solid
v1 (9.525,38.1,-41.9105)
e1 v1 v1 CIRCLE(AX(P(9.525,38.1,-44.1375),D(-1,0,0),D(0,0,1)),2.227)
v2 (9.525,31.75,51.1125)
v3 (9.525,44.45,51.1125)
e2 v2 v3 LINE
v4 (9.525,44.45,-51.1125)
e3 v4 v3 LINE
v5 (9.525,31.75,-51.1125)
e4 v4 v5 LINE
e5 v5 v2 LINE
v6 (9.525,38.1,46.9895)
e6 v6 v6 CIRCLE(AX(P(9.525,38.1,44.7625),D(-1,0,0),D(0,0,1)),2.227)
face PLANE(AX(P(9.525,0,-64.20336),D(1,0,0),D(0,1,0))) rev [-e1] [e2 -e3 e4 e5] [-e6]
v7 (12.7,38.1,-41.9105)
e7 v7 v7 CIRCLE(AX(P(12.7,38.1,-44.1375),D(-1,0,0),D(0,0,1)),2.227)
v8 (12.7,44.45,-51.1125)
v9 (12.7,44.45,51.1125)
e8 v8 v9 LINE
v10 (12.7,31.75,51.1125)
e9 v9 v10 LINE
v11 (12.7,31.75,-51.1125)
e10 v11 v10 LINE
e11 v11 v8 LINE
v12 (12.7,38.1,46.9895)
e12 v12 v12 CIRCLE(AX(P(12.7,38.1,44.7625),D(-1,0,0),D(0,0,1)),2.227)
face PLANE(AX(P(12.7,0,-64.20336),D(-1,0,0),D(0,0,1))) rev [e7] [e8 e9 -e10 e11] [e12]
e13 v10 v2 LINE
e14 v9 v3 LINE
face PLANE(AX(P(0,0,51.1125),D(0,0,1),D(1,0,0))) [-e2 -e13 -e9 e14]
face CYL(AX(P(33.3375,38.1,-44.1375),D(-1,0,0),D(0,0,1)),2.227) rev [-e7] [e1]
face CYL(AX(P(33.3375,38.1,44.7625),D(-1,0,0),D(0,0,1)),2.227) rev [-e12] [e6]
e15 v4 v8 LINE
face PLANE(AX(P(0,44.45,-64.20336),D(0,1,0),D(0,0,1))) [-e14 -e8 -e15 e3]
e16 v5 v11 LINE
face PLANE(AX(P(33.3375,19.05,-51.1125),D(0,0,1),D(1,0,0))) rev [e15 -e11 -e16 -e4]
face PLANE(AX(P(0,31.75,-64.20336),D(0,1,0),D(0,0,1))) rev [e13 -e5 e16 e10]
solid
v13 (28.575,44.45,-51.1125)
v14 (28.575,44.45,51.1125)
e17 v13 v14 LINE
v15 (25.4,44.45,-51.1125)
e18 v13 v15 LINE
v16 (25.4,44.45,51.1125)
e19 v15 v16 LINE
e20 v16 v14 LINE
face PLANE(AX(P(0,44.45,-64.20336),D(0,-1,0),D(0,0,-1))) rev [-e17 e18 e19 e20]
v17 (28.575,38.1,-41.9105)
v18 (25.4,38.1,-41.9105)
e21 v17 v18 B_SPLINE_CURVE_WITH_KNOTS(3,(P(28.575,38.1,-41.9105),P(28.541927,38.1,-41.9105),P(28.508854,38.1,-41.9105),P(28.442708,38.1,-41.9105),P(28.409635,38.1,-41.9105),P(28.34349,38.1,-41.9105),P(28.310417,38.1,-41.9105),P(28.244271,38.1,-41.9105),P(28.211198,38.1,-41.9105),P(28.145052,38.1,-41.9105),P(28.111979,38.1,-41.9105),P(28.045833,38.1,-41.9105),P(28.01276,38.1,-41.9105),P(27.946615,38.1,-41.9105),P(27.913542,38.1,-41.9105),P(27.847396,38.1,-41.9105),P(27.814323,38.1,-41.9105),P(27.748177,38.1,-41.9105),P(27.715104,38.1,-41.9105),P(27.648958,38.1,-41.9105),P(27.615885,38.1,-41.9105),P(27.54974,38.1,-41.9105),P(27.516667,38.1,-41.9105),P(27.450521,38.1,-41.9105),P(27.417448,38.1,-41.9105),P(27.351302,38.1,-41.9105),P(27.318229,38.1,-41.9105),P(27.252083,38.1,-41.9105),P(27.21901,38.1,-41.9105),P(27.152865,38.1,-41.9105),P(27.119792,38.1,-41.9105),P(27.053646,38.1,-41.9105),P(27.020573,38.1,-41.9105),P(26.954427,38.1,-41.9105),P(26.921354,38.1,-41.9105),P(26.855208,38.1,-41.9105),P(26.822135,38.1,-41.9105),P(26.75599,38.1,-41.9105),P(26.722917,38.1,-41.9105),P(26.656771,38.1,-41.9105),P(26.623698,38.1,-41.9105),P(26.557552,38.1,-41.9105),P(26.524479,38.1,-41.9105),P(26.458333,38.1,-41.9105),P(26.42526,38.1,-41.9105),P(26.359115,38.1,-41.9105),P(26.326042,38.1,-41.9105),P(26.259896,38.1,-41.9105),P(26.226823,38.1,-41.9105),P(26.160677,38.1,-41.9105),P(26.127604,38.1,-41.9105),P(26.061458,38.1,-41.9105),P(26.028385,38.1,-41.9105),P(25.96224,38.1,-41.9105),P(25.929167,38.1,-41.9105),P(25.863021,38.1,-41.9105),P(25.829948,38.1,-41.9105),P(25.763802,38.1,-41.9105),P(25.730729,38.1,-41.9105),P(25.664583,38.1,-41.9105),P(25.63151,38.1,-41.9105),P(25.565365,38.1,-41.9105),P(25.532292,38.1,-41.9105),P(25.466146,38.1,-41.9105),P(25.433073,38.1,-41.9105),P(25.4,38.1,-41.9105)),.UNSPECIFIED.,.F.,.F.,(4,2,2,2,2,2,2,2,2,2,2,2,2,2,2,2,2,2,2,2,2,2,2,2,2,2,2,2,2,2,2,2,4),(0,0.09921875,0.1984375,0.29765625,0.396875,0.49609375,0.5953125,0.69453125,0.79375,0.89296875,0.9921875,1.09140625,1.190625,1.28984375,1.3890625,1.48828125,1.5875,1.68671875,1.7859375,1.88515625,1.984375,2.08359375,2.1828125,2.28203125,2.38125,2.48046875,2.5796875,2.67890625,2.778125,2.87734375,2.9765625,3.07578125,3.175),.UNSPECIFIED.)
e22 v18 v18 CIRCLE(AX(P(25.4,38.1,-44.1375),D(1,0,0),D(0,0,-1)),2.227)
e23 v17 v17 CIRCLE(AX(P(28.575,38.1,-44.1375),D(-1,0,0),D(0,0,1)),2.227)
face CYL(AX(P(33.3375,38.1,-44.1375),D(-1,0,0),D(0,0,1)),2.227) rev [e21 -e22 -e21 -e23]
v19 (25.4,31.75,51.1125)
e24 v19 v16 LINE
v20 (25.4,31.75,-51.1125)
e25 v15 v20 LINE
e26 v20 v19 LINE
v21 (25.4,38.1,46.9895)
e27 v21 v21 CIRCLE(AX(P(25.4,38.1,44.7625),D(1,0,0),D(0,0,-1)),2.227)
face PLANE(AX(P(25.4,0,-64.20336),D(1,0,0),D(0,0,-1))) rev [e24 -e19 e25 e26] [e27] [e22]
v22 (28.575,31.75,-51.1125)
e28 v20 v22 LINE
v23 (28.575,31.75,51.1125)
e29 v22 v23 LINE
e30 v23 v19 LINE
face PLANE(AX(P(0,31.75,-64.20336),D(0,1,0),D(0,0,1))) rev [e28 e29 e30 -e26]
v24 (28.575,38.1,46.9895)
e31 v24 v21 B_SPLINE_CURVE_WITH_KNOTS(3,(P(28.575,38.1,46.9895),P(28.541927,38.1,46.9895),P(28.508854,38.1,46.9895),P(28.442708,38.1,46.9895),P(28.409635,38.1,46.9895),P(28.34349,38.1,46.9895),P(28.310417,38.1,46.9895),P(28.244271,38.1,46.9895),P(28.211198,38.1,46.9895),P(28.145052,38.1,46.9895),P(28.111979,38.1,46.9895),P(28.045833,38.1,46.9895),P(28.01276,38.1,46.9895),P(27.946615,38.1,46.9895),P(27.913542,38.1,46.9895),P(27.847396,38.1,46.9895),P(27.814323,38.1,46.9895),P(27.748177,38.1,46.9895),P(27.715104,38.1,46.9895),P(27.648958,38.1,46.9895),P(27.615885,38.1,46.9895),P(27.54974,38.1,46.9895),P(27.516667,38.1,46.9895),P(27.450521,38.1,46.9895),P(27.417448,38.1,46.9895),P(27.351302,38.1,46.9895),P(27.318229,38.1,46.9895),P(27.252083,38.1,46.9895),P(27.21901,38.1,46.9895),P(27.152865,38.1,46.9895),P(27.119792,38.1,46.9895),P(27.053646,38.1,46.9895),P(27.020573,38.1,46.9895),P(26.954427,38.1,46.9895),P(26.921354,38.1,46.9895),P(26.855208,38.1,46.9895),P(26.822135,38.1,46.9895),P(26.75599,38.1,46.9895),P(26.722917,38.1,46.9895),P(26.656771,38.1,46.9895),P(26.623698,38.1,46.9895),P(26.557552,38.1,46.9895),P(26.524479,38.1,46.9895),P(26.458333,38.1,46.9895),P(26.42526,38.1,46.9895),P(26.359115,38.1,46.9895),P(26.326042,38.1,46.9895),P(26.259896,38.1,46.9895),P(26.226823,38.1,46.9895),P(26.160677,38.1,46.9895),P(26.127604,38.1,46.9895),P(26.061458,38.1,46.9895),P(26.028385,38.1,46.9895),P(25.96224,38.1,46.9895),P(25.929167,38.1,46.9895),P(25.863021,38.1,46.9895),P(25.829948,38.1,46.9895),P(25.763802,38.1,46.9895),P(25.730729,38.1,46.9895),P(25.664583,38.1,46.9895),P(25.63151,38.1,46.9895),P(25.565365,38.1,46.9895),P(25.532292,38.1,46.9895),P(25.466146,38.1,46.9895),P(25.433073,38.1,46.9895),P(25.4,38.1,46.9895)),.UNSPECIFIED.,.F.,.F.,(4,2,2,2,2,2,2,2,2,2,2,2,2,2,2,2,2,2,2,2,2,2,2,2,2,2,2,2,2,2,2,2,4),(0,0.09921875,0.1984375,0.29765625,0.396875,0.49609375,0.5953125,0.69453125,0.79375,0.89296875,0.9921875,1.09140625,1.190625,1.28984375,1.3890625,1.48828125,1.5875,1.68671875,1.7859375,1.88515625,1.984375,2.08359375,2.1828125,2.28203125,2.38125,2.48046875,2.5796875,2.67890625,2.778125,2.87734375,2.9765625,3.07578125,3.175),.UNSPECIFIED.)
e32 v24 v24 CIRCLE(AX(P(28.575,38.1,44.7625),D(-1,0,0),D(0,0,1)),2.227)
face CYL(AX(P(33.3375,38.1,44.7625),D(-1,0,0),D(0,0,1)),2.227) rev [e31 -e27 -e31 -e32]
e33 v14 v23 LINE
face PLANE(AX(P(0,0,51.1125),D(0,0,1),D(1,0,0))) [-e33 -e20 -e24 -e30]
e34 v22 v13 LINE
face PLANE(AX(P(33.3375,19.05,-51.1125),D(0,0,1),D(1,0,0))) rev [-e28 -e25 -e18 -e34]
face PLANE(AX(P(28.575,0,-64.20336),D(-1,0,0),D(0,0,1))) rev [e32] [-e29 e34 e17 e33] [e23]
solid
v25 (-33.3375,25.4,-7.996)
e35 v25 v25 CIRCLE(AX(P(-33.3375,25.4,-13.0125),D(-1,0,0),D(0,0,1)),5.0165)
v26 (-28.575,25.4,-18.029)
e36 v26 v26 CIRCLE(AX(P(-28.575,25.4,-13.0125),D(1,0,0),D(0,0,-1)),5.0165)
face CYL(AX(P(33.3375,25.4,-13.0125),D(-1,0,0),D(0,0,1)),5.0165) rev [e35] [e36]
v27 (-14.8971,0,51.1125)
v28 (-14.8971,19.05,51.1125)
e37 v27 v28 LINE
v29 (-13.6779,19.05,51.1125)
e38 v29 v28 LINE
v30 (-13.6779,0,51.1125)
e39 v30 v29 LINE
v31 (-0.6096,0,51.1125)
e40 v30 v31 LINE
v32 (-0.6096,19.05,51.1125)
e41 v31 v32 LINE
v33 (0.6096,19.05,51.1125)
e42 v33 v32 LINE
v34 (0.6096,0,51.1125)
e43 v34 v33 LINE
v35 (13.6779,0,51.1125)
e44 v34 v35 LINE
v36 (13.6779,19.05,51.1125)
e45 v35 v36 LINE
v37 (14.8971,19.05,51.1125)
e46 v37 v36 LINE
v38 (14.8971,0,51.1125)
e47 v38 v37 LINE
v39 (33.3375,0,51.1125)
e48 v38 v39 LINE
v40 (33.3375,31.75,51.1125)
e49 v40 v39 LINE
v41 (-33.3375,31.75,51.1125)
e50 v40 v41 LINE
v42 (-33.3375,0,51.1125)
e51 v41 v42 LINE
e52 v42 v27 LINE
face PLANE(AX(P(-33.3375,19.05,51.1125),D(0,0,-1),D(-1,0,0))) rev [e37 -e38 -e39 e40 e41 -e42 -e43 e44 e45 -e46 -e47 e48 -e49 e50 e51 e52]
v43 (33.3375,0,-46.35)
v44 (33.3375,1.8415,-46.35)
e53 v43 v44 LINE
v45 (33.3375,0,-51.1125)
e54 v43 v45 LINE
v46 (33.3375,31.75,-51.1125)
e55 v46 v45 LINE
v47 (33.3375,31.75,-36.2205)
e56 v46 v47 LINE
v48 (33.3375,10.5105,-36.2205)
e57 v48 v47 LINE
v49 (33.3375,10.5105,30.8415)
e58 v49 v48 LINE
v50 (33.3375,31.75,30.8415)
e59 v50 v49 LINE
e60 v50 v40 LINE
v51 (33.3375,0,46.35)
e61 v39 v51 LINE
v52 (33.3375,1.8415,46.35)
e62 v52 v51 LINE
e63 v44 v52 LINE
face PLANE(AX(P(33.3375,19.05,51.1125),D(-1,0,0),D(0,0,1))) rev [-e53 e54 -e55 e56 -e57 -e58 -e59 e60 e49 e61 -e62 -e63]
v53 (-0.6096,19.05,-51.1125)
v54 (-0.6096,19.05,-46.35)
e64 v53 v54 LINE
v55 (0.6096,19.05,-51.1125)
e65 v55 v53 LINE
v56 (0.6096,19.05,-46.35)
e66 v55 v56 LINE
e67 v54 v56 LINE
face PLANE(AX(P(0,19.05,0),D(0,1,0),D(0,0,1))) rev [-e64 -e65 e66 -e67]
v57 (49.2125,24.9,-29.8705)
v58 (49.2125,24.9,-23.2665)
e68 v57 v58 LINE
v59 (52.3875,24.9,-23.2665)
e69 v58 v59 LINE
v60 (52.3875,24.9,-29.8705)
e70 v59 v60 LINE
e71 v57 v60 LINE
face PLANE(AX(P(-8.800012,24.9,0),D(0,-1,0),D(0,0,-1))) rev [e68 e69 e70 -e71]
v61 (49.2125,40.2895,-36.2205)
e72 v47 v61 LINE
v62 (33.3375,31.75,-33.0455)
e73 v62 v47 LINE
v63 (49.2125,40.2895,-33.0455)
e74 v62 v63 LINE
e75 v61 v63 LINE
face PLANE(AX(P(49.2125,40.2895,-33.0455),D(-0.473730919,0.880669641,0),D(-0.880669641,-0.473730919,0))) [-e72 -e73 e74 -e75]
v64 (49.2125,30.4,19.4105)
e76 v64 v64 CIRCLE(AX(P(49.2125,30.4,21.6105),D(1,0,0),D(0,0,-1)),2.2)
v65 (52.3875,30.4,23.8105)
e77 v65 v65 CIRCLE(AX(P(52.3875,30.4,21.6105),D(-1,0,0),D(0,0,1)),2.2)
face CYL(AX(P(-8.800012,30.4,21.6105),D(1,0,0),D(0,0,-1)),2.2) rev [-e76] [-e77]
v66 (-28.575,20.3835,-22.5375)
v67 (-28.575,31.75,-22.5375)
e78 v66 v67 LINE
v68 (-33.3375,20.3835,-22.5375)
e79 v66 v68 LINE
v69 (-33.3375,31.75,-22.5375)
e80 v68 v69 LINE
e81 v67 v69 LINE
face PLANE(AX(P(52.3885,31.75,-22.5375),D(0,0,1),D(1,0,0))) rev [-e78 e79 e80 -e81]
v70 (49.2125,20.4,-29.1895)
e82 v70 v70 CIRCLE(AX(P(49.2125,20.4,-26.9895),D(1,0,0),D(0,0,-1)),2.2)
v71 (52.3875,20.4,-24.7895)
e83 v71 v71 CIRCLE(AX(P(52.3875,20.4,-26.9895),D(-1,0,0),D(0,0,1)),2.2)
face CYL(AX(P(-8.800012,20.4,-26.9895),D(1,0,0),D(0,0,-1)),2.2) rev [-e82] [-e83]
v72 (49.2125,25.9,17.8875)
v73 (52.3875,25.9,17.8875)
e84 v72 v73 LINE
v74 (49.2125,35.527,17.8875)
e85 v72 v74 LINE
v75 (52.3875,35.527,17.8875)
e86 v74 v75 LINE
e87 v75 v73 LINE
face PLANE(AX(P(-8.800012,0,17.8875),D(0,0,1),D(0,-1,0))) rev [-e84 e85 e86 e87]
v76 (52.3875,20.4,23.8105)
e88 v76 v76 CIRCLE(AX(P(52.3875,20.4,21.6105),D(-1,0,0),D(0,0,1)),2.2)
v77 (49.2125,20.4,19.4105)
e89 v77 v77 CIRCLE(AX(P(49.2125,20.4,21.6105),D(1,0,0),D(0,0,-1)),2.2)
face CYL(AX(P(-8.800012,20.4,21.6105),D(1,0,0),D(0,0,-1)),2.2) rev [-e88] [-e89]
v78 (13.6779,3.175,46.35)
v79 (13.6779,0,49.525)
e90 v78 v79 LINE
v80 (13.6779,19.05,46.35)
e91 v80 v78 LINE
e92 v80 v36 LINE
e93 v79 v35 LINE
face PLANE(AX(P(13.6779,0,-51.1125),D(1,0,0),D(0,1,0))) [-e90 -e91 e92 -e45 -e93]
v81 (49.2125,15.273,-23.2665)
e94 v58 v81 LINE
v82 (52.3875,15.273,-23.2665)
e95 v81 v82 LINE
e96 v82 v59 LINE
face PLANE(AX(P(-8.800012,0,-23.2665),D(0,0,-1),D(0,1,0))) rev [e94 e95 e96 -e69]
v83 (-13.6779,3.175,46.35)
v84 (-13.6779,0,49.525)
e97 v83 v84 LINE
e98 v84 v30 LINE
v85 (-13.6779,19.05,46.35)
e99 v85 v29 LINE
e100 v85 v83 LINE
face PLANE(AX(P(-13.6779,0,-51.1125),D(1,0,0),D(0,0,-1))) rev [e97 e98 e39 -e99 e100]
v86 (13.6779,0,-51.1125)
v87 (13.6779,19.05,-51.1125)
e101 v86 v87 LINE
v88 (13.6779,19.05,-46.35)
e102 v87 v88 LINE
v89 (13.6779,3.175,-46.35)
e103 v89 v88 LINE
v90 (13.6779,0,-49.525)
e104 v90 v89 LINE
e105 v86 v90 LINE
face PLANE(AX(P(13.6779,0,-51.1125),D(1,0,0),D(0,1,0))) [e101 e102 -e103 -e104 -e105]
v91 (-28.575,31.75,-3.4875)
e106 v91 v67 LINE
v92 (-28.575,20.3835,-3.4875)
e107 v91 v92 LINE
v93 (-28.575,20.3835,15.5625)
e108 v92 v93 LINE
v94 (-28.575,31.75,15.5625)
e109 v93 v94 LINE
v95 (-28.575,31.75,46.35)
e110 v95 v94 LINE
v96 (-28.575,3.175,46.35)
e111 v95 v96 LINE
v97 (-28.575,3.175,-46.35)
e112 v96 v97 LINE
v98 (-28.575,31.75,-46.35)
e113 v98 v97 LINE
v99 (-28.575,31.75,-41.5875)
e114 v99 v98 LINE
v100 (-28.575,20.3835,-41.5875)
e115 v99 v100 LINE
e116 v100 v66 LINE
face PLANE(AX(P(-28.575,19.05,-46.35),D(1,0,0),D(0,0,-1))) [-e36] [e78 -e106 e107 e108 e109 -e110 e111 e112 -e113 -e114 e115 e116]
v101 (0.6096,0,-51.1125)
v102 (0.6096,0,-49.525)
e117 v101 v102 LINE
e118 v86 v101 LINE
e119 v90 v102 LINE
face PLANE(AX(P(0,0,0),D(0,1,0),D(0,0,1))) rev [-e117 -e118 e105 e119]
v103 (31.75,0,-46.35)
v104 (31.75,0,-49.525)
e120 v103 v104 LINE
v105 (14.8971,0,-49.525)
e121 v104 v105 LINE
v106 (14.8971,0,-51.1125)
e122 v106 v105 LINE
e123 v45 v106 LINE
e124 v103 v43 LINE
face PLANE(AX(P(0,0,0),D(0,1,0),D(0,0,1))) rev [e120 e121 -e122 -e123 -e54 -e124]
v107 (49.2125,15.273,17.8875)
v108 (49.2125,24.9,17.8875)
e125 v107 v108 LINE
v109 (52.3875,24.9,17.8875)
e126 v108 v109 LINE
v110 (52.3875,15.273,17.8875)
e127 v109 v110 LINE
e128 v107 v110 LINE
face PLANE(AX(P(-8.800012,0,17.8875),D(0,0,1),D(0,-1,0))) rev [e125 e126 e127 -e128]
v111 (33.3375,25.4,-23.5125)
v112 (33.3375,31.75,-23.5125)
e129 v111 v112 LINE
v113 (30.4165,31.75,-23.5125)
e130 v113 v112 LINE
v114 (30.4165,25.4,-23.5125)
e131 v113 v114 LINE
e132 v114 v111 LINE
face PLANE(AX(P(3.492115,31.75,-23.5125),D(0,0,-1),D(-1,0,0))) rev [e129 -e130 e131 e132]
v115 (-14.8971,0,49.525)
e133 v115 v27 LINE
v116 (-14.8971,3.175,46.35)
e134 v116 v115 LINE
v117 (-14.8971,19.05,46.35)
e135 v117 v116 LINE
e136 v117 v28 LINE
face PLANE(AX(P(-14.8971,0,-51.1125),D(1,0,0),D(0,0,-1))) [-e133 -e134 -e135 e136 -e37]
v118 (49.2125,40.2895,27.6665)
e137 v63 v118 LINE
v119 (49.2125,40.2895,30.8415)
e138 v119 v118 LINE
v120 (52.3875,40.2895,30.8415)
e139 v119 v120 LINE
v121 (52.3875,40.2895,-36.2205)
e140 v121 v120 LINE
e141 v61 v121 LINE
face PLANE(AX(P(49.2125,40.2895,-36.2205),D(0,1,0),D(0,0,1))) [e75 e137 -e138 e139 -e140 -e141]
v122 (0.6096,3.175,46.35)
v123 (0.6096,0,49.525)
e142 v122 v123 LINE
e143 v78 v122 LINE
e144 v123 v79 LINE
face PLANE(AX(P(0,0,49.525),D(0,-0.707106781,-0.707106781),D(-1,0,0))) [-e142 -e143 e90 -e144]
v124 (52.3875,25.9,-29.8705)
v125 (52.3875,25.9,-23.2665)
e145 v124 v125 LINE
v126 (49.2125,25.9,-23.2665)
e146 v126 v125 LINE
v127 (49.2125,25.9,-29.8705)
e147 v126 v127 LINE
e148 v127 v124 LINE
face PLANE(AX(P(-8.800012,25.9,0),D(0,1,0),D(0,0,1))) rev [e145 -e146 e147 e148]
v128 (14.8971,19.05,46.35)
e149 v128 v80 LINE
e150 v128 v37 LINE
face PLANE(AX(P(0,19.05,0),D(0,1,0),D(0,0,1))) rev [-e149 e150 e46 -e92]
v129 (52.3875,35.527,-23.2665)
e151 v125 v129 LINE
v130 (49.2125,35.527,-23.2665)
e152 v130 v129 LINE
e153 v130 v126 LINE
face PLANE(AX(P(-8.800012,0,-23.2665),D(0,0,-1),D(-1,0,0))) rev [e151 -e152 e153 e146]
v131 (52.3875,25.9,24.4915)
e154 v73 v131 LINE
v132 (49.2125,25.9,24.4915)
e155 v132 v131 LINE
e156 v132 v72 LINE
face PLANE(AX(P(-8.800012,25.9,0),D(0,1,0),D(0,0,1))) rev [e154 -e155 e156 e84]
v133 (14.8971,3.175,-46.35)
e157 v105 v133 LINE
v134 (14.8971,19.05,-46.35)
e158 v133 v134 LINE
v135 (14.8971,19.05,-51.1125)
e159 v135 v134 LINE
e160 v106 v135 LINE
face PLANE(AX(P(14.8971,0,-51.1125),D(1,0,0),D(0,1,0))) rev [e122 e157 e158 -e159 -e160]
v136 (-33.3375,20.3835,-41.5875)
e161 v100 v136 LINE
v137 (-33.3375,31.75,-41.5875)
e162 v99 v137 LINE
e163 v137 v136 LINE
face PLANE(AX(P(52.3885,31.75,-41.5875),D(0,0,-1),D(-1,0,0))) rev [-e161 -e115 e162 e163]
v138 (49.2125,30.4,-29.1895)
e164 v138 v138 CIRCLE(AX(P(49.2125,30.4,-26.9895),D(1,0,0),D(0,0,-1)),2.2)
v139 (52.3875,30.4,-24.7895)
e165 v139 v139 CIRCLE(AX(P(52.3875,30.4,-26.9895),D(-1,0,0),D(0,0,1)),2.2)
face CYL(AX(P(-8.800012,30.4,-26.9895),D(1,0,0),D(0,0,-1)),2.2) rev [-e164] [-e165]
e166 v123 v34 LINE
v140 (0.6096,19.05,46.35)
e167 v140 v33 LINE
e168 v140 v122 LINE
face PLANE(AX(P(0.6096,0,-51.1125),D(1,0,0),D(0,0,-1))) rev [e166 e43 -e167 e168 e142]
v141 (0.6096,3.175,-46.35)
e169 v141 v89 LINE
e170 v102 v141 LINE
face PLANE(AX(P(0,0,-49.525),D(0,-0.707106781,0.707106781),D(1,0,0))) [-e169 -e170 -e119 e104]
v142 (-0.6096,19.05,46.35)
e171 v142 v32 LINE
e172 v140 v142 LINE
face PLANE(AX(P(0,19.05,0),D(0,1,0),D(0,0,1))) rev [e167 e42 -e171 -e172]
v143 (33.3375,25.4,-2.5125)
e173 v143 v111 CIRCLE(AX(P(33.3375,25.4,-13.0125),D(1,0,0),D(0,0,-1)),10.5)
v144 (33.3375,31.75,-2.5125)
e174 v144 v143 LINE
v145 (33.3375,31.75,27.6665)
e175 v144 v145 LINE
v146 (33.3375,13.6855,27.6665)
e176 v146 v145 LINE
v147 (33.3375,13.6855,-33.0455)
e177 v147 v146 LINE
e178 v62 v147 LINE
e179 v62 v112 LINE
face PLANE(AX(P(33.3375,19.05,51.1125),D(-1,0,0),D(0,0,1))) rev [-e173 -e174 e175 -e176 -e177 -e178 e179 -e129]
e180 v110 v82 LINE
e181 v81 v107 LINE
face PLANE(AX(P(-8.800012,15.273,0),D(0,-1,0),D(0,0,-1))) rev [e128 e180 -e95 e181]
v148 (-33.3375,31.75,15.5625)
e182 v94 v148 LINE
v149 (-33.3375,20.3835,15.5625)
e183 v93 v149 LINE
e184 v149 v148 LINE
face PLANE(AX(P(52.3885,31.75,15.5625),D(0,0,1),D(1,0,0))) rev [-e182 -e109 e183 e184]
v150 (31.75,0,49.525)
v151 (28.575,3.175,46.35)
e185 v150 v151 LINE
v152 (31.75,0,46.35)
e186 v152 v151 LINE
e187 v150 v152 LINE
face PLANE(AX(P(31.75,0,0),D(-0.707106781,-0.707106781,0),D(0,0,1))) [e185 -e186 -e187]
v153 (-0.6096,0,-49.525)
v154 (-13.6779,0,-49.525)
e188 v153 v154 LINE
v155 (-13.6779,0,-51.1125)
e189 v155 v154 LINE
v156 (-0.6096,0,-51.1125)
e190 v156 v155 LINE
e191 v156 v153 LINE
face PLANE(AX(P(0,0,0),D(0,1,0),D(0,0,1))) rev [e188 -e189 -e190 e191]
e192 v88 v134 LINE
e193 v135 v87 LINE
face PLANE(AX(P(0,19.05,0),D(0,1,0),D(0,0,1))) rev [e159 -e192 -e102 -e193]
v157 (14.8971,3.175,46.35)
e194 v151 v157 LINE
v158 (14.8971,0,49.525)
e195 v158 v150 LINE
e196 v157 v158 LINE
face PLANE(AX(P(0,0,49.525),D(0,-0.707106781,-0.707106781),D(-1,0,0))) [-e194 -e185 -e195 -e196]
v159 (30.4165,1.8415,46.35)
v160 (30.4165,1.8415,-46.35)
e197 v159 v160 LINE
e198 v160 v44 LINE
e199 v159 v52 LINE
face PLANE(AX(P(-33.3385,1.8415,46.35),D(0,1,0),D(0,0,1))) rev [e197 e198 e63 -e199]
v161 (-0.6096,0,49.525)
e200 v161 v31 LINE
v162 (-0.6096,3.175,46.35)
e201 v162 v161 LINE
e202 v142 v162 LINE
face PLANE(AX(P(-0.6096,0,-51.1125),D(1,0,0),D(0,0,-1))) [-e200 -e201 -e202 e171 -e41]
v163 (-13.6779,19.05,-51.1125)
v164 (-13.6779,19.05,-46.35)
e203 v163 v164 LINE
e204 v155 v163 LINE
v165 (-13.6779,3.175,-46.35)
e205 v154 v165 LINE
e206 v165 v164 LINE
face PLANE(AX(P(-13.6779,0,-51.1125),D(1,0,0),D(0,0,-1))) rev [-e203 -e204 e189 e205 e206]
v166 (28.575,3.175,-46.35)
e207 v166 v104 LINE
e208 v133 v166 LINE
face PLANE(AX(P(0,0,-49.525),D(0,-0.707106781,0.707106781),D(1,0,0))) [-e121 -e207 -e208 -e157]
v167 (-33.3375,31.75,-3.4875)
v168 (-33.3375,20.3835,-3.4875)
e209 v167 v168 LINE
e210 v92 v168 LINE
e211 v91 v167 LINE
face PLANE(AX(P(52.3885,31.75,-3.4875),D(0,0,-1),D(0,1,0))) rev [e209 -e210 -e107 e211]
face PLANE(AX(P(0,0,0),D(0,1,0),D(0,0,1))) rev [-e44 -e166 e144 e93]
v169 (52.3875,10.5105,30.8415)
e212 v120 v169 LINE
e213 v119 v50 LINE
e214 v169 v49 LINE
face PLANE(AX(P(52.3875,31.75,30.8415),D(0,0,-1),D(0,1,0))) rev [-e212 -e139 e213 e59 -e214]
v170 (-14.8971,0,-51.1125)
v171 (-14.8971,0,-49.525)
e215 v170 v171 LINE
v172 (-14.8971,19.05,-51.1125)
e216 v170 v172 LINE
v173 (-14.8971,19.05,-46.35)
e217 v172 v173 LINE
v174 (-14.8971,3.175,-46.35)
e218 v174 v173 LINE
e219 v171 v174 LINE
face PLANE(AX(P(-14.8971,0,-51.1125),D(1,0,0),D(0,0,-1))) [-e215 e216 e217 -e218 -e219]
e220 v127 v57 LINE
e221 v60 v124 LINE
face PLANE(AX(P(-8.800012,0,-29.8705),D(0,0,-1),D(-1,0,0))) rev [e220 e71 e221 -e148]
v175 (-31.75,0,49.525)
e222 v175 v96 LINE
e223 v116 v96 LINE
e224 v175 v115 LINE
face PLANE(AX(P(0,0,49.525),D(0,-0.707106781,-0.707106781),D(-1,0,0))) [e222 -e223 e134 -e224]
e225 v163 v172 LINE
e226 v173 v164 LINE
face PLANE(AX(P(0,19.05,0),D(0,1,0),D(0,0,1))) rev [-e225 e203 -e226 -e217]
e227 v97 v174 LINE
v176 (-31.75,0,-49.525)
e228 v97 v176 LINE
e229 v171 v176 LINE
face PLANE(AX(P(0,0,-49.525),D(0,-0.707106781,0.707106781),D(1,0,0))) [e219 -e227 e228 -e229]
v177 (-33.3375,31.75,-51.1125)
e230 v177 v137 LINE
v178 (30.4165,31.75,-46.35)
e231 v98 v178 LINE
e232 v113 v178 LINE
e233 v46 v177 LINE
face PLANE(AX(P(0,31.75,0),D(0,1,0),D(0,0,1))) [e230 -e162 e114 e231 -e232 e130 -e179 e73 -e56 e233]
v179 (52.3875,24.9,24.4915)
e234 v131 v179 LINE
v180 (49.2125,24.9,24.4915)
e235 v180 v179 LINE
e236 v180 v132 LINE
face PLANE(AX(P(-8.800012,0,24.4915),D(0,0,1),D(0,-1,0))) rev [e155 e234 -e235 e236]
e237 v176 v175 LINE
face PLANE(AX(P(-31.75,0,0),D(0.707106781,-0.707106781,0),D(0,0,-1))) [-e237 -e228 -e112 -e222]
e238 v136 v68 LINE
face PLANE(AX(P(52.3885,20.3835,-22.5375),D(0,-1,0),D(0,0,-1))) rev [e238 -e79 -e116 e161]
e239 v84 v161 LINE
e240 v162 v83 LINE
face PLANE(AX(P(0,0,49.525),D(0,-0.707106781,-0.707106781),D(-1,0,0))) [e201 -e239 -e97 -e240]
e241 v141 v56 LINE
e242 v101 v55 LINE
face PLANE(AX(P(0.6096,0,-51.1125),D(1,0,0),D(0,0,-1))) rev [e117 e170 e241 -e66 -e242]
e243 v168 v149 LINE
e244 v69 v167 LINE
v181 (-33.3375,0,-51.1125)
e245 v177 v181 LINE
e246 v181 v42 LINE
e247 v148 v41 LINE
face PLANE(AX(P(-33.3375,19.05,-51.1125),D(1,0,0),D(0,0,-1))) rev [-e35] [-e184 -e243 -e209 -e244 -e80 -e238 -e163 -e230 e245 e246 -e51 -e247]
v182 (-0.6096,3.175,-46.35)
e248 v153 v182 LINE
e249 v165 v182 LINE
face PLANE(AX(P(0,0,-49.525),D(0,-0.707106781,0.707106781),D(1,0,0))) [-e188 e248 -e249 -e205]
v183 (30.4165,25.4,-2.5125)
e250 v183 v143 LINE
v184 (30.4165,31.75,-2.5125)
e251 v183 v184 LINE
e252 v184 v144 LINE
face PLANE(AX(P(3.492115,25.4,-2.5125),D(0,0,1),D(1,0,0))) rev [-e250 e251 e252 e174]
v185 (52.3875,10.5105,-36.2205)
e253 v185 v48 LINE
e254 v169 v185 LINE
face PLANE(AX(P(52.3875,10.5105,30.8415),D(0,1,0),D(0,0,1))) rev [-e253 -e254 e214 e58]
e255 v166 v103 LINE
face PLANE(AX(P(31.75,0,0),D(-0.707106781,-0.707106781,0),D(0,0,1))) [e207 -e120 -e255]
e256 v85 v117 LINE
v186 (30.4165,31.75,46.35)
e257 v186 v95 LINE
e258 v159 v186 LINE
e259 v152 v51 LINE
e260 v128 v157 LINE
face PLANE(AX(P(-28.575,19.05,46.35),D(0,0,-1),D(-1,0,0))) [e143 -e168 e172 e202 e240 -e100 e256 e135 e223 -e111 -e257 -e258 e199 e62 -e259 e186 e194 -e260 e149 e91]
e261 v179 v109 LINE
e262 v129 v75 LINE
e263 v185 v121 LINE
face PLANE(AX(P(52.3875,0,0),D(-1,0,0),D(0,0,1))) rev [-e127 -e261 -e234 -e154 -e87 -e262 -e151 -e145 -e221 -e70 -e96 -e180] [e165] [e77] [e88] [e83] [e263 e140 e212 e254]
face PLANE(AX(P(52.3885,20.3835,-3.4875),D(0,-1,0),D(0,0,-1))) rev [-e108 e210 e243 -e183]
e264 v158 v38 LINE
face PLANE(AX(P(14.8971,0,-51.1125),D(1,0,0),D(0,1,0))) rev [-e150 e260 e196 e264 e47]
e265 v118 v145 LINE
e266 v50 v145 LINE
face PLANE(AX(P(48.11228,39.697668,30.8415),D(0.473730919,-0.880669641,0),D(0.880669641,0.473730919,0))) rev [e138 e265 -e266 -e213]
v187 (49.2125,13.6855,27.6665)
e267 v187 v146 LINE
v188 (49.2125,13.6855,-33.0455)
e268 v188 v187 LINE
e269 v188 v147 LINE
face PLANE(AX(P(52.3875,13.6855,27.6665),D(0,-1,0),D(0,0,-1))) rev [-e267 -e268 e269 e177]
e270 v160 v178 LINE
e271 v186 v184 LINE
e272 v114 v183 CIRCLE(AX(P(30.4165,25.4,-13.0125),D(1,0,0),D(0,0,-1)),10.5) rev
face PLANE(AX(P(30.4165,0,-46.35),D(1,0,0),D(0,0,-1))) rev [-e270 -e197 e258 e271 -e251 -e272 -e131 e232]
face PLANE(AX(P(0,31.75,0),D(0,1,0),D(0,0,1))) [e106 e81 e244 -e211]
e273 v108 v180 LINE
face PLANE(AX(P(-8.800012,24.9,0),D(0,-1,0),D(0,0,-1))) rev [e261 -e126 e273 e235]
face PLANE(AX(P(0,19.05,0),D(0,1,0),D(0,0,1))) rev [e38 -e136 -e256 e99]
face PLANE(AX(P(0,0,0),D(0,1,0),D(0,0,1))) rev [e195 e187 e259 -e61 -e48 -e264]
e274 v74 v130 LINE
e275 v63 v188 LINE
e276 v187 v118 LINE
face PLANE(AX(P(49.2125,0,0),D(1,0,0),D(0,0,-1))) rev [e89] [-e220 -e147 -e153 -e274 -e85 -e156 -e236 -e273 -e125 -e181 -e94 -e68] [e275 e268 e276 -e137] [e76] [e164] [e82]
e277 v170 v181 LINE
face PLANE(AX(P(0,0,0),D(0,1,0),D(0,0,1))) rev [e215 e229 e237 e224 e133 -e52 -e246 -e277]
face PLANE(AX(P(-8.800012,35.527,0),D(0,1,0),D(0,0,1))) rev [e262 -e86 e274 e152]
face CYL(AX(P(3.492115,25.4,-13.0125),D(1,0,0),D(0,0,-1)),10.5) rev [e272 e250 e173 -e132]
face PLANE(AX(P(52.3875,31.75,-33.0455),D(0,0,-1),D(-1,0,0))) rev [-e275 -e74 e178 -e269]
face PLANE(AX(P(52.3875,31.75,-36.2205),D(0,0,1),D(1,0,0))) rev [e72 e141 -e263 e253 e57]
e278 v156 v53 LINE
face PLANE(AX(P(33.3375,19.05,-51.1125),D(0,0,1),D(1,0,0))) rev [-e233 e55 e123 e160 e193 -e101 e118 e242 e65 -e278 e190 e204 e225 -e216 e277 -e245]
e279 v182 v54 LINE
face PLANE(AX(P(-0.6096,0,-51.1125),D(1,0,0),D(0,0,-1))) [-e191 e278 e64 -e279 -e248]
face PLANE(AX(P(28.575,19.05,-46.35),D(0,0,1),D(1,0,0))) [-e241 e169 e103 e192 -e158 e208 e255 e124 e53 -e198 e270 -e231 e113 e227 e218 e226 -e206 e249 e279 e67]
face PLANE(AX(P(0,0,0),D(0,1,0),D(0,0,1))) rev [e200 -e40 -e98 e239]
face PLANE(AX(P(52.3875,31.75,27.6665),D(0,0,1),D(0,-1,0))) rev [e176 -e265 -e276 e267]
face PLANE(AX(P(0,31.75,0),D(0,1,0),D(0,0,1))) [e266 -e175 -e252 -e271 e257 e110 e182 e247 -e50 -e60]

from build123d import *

# Parameters (mm, degrees)
SKETCH4_W               = 66.675
SKETCH4_H               = 102.22500002
SKETCH4_W_2             = 57.15
SKETCH4_H_2             = 92.70000002
BOSS_EXTRUDE1_DEPTH     = 19.05
BOSS_EXTRUDE2_START     = 19.05
SKETCH5_W               = 66.675
SKETCH5_H               = 102.22500002
BOSS_EXTRUDE2_DEPTH     = 12.7
FILLET1_SIZE            = 3.175
SKETCH6_W               = 1.2192
SKETCH6_H               = 19.05
CUT_EXTRUDE_THIN1_DEPTH = 118.182461581
SKETCH8_W               = 3.175
SKETCH8_H               = 12.7
BOSS_EXTRUDE3_DEPTH     = 102.22500002
BOSS_EXTRUDE3_2_DEPTH   = 102.22500002
SKETCH9_R               = 2.226999991
CUT_EXTRUDE2_DEPTH      = 81.159117158
SKETCH14_W              = 57.15
SKETCH14_H              = 92.70000002
CUT_EXTRUDE8_DEPTH      = 12.7
SKETCH26_W              = 1.8415
SKETCH26_H              = 92.70000002
CUT_EXTRUDE11_DEPTH     = 69.789091167
CUT_EXTRUDE12_START     = -2.921
SKETCH27_W              = 92.70000002
SKETCH27_H              = 1.8415
CUT_EXTRUDE12_DEPTH     = 2.921
SKETCH30_R              = 5.0165
CUT_EXTRUDE13_DEPTH     = 96.046545346
CUT_EXTRUDE16_DEPTH     = 2.921
BOSS_EXTRUDE4_DEPTH     = 19.05
SKETCH34_W              = 67.061999988
SKETCH34_H              = 29.778999878
BOSS_EXTRUDE5_DEPTH     = 3.175
CUT_EXTRUDE17_START     = 19.05
SKETCH32_R              = 2.200000045
CUT_EXTRUDE17_DEPTH     = 3.175
BOSS_EXTRUDE6_DEPTH     = 3.175
BOSS_EXTRUDE8_START     = 27.666500001
BOSS_EXTRUDE8_DEPTH     = 3.175
SKETCH36_W              = 19.05
SKETCH36_H              = 11.3665
CUT_EXTRUDE18_DEPTH     = 4.7625


# Read off the part's stored shape, not the designer's step: Boss-Extrude8
with BuildPart() as part:
    # Sketch4 → Boss-Extrude1 (new body)
    with BuildSketch(Plane(origin=(0, 0, 0), x_dir=(1, 0, 0), z_dir=(0, 1, 0))):
        Rectangle(SKETCH4_W, SKETCH4_H)
        Rectangle(SKETCH4_W_2, SKETCH4_H_2, mode=Mode.SUBTRACT)
    extrude(amount=BOSS_EXTRUDE1_DEPTH)

    # Sketch5 → Boss-Extrude2 (add)
    with BuildSketch(Plane(origin=(0, 0, 0), x_dir=(1, 0, 0), z_dir=(0, 1, 0)).offset(BOSS_EXTRUDE2_START)):
        Rectangle(SKETCH5_W, SKETCH5_H)
    extrude(amount=BOSS_EXTRUDE2_DEPTH)

    # Fillet1
    fillet1_edges = [part.edges().sort_by_distance(p)[0] for p in [
        (-28.575, 0, 0),
        (0, 0, 46.35000001),
        (28.575, 0, 0),
        (0, 0, -46.35000001),
    ]]
    chamfer(fillet1_edges, length=FILLET1_SIZE)

    # Sketch6 → Cut-Extrude-Thin1 (cut, through all)
    with BuildSketch(Plane(origin=(14.34600001, 0, 51.11250001), x_dir=(-1, 0, 0), z_dir=(0, 0, -1))):
        with Locations((14.34600001, 9.525)):
            Rectangle(SKETCH6_W, SKETCH6_H)
        with Locations((28.63350001, 9.525)):
            Rectangle(SKETCH6_W, SKETCH6_H)
        with Locations((0.05850001, 9.525)):
            Rectangle(SKETCH6_W, SKETCH6_H)
    extrude(amount=CUT_EXTRUDE_THIN1_DEPTH, mode=Mode.SUBTRACT)

    # Sketch14 → Cut-Extrude8 (cut)
    with BuildSketch(Plane.XZ.offset(-19.05)):
        Rectangle(SKETCH14_W, SKETCH14_H)
    extrude(amount=-CUT_EXTRUDE8_DEPTH, mode=Mode.SUBTRACT)

    # Sketch26 → Cut-Extrude11 (cut, through all)
    with BuildSketch(Plane(origin=(0, 31.75, 0), x_dir=(1, 0, 0), z_dir=(0, 1, 0))):
        with Locations((29.49575, 0)):
            Rectangle(SKETCH26_W, SKETCH26_H)
    extrude(amount=-CUT_EXTRUDE11_DEPTH, mode=Mode.SUBTRACT)

    # Sketch27 → Cut-Extrude12 (cut)
    with BuildSketch(Plane(origin=(33.3375, 0, 0), x_dir=(0, 0, -1), z_dir=(1, 0, 0)).offset(CUT_EXTRUDE12_START)):
        with Locations((0, 0.92075)):
            Rectangle(SKETCH27_W, SKETCH27_H)
    extrude(amount=CUT_EXTRUDE12_DEPTH, mode=Mode.SUBTRACT)

    # Sketch30 → Cut-Extrude13 (cut, through all)
    with BuildSketch(Plane.ZY.offset(33.3375)):
        with Locations((-13.01250001, 25.4)):
            Circle(SKETCH30_R)
    extrude(amount=-CUT_EXTRUDE13_DEPTH, mode=Mode.SUBTRACT)

    # Sketch31 → Cut-Extrude16 (cut)
    with BuildSketch(Plane(origin=(33.3375, 0, 0), x_dir=(0, 0, -1), z_dir=(1, 0, 0))):
        with BuildLine():
            Line((2.512500055, 25.4), (2.512500055, 31.75))
            Line((2.512500055, 31.75), (23.512499965, 31.75))
            Line((23.512499965, 31.75), (23.512499965, 25.4))
            ThreePointArc((23.512499965, 25.4), (13.01250001, 14.900000045), (2.512500055, 25.4))
        make_face()
    extrude(amount=-CUT_EXTRUDE16_DEPTH, mode=Mode.SUBTRACT)

    # Sketch33 → Boss-Extrude4 (add)
    with BuildSketch(Plane(origin=(33.3375, 0, 0), x_dir=(0, 0, -1), z_dir=(1, 0, 0))):
        Polygon((-27.666500001, 31.75), (-27.666500001, 13.685500057), (33.045499987, 13.685500057), (33.045499987, 31.75), (36.220499987, 31.75), (36.220499987, 10.510500057), (-30.841500001, 10.510500057), (-30.841500001, 31.75), align=None)
    extrude(amount=BOSS_EXTRUDE4_DEPTH)

    # Sketch34 → Boss-Extrude5 (add)
    with BuildSketch(Plane(origin=(52.3875, 0, 0), x_dir=(0, 0, -1), z_dir=(1, 0, 0))):
        with Locations((2.689499993, 25.399999996)):
            Rectangle(SKETCH34_W, SKETCH34_H)
    extrude(amount=-BOSS_EXTRUDE5_DEPTH)

    # Sketch32 → Cut-Extrude17 (cut)
    with BuildSketch(Plane(origin=(33.3375, 0, 0), x_dir=(0, 0, -1), z_dir=(1, 0, 0)).offset(CUT_EXTRUDE17_START)):
        with Locations((26.989500034, 30.400000029)):
            Circle(SKETCH32_R)
        with Locations((26.989500034, 20.399999963)):
            Circle(SKETCH32_R)
        with Locations((-21.610500048, 30.400000029)):
            Circle(SKETCH32_R)
        with Locations((-21.610500048, 20.399999963)):
            Circle(SKETCH32_R)
        Polygon((23.266499987, 15.273000057), (23.266499987, 24.899999996), (29.870499987, 24.899999996), (29.870499987, 25.899999996), (23.266499987, 25.899999996), (23.266499987, 35.526999935), (-17.887500001, 35.526999935), (-17.887500001, 25.899999996), (-24.491500001, 25.899999996), (-24.491500001, 24.899999996), (-17.887500001, 24.899999996), (-17.887500001, 15.273000057), align=None)
    extrude(amount=-CUT_EXTRUDE17_DEPTH, mode=Mode.SUBTRACT)

    # Sketch35 → Boss-Extrude6 (add)
    with BuildSketch(Plane(origin=(0, 0, -36.220499987), x_dir=(-1, 0, 0), z_dir=(0, 0, -1))):
        Polygon((-49.2125, 40.289499935), (-33.3375, 31.75), (-49.2125, 31.75), align=None)
    extrude(amount=-BOSS_EXTRUDE6_DEPTH)

    # Boss-Extrude8 outline → Boss-Extrude8 (add)
    with BuildSketch(Plane.XY.offset(BOSS_EXTRUDE8_START)):
        Polygon((49.2125, 40.289499935), (33.3375, 31.75), (49.2125, 31.75), align=None)
    extrude(amount=BOSS_EXTRUDE8_DEPTH)

    # Sketch36 → Cut-Extrude18 (cut)
    with BuildSketch(Plane.ZY.offset(33.3375)):
        with Locations((6.03749999, 26.06675)):
            Rectangle(SKETCH36_W, SKETCH36_H)
        with Locations((-32.06250001, 26.06675)):
            Rectangle(SKETCH36_W, SKETCH36_H)
    extrude(amount=-CUT_EXTRUDE18_DEPTH, mode=Mode.SUBTRACT)


with BuildPart() as body_2:
    # Sketch8 → Boss-Extrude3 (new body)
    with BuildSketch(Plane.XY.offset(51.11250001)):
        with Locations((11.1125, 38.1)):
            Rectangle(SKETCH8_W, SKETCH8_H)
    extrude(amount=-BOSS_EXTRUDE3_DEPTH)


with BuildPart() as body_3:
    # Sketch8 → Boss-Extrude3 2 (new body)
    with BuildSketch(Plane.XY.offset(51.11250001)):
        with Locations((26.9875, 38.1)):
            Rectangle(SKETCH8_W, SKETCH8_H)
    extrude(amount=-BOSS_EXTRUDE3_2_DEPTH)


with BuildPart() as cut_extrude2_tool:
    # Sketch9 → Cut-Extrude2 (new, through all)
    with BuildSketch(Plane.ZY.offset(-9.525)):
        with Locations((44.76250001, 38.1)):
            Circle(SKETCH9_R)
        with Locations((-44.13749999, 38.1)):
            Circle(SKETCH9_R)
    extrude(amount=-CUT_EXTRUDE2_DEPTH)


with BuildPart() as body_2_1:
    add(body_2.part)

    # Cut-Extrude2: cut by cut_extrude2_tool
    add(cut_extrude2_tool.part, mode=Mode.SUBTRACT)


with BuildPart() as body_3_1:
    add(body_3.part)

    # Cut-Extrude2: cut by cut_extrude2_tool
    add(cut_extrude2_tool.part, mode=Mode.SUBTRACT)


solid = Compound([part.part, body_2_1.part, body_3_1.part])
